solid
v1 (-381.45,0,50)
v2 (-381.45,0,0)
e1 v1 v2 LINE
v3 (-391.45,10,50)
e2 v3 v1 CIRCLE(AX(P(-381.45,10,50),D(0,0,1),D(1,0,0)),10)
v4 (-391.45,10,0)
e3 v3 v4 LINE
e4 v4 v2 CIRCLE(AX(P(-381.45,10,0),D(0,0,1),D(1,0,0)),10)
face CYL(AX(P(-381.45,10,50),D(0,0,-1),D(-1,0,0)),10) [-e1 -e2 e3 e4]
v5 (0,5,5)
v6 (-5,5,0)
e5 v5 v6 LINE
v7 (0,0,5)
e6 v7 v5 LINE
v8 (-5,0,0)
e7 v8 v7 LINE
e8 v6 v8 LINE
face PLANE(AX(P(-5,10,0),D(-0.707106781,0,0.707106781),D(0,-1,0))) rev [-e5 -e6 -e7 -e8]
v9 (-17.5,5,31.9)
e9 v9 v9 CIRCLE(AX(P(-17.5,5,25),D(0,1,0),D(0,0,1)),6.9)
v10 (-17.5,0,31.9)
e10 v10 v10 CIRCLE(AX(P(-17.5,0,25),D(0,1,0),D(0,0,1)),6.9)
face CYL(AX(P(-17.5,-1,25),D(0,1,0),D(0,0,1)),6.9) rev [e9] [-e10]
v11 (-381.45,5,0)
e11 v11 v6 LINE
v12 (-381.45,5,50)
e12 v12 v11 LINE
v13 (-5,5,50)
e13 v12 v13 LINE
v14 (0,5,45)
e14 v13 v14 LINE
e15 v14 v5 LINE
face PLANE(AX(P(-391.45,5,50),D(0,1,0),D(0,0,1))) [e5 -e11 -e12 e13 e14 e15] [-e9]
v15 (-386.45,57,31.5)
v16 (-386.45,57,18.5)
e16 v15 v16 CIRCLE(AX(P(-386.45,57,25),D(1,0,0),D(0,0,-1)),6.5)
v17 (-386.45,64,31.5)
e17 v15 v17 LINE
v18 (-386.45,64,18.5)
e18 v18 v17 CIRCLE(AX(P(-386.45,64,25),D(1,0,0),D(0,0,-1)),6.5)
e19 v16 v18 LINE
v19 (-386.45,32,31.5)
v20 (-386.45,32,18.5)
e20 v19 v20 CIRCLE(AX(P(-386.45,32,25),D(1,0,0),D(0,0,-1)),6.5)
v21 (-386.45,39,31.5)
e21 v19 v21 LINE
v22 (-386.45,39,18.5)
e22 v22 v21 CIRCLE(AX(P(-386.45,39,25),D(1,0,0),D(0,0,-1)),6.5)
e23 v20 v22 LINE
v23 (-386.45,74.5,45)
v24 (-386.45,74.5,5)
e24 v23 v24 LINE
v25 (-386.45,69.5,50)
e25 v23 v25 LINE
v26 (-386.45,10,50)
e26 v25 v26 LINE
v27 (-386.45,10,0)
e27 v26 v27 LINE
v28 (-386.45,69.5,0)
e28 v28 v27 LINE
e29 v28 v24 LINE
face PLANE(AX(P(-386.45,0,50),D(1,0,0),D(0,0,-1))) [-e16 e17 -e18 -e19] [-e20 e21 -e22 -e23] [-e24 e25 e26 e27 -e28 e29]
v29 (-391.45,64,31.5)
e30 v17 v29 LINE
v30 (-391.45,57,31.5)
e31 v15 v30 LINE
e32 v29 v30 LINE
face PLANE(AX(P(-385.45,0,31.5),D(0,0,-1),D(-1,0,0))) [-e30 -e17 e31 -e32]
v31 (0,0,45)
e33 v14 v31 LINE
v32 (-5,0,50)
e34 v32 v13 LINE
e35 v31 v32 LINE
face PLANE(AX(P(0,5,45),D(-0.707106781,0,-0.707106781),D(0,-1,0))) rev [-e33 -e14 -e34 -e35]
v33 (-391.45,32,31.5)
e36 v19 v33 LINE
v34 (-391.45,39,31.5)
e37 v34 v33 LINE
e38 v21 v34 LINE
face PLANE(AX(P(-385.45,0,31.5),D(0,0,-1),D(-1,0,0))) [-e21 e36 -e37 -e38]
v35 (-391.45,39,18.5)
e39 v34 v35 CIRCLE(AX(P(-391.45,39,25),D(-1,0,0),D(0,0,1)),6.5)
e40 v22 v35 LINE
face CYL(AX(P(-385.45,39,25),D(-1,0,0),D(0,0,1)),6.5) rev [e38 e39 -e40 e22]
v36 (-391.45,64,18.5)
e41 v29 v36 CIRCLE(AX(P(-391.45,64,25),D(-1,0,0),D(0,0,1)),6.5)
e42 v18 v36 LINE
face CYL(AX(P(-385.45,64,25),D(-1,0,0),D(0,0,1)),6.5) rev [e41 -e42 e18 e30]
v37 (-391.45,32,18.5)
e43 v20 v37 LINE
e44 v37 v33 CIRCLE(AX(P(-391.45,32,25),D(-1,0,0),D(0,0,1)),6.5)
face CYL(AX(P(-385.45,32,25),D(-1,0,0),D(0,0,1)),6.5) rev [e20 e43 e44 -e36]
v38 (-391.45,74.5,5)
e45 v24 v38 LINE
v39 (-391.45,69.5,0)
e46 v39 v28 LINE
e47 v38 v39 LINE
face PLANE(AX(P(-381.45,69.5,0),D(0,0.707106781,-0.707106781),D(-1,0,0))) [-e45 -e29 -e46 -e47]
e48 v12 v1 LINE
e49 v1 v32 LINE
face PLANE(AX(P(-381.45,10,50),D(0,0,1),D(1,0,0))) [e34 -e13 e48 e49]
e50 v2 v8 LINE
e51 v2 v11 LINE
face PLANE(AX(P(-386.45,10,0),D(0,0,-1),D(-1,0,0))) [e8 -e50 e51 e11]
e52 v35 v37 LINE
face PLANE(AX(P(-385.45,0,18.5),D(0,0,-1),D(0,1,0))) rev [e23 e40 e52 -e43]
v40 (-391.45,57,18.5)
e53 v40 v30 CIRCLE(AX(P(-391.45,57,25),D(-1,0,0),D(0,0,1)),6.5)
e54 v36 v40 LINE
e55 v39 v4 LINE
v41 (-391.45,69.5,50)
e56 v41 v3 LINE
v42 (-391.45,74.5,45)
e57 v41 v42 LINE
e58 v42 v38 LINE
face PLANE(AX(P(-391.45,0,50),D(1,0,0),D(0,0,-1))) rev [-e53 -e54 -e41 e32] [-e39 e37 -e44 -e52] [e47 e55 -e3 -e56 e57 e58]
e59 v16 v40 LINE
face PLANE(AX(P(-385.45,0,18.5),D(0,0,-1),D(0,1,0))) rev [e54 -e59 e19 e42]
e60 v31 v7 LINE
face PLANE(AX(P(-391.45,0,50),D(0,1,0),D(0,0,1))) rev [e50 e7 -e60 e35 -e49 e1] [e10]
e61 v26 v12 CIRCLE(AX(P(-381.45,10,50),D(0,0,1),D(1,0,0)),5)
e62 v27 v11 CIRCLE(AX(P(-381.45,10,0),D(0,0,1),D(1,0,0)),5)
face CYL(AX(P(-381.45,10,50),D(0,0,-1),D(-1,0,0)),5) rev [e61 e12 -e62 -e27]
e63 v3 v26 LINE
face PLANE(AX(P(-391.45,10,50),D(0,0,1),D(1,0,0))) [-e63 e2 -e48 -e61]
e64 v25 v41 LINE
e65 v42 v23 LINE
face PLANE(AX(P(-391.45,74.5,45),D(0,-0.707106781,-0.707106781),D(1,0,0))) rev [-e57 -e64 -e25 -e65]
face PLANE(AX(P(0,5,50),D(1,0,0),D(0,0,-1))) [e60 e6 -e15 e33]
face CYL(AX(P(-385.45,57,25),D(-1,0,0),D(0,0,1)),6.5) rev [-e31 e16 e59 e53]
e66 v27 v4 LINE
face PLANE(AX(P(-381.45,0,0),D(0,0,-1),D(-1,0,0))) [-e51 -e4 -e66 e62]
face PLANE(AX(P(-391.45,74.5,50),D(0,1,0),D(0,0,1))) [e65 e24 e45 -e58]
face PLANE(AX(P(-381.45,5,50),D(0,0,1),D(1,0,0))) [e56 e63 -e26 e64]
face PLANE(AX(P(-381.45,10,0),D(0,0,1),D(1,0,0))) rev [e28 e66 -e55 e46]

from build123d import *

# Parameters (mm, degrees)
SM_BASE_FLANGE_1_DEPTH = 50
SKETCH_3_R             = 6.9
CUT_EXTRUDE_2_DEPTH    = 10
SKETCH_4_R             = 6.5
CUT_EXTRUDE_3_DEPTH    = 10
OTHER_START            = 49.143921292
OTHER_1_OUTLINE_W      = 8
OTHER_1_OUTLINE_H      = 38
OTHER_1_DEPTH          = 3.535533906
OTHER_START_2          = 84.499260352
OTHER_1_2_OUTLINE_W    = 8
OTHER_1_2_OUTLINE_H    = 10
OTHER_1_2_DEPTH        = 3.535533906
OTHER_START_3          = -3.535533906
OTHER_1_3_OUTLINE_W    = 10
OTHER_1_3_OUTLINE_H    = 7
OTHER_1_3_DEPTH        = 3.535533906
OTHER_START_4          = 31.819805153
OTHER_1_4_OUTLINE_W    = 38
OTHER_1_4_OUTLINE_H    = 7
OTHER_1_4_DEPTH        = 3.535533906


# Read off the part's stored shape, not the designer's step: Затупленный угол1
# Sheet-metal steps are written as plain solids
with BuildPart() as part:
    # Sketch 1 → Базовая кромка1 (new body)
    with BuildSketch(Plane.XY):
        with BuildLine():
            Line((-391.45, 74.5), (-391.45, 10))
            ThreePointArc((-391.45, 10), (-388.521067812, 2.928932188), (-381.45, 0))
            Line((-381.45, 0), (0, 0))
            Line((0, 0), (0, 5))
            Line((0, 5), (-381.45, 5))
            ThreePointArc((-381.45, 5), (-384.985533906, 6.464466094), (-386.45, 10))
            Line((-386.45, 10), (-386.45, 74.5))
            Line((-386.45, 74.5), (-391.45, 74.5))
        make_face()
    extrude(amount=SM_BASE_FLANGE_1_DEPTH)

    # Эскиз3 → Вырез-Вытянуть2 (cut)
    with BuildSketch(Plane(origin=(0, 5, 0), x_dir=(1, 0, 0), z_dir=(0, 1, 0))):
        with Locations(Location((-17.5, -25, 0), (0, 0, 270))):
            Circle(SKETCH_3_R)
    extrude(amount=-CUT_EXTRUDE_2_DEPTH, mode=Mode.SUBTRACT)

    # Эскиз4 → Вырез-Вытянуть3 (cut)
    with BuildSketch(Plane.ZY.offset(391.45)):
        with BuildLine():
            Line((31.5, 32), (31.5, 35.5))
            ThreePointArc((31.5, 35.5), (25, 29), (18.5, 35.5))
            Line((18.5, 35.5), (18.5, 32))
            ThreePointArc((18.5, 32), (25, 25.5), (31.5, 32))
        make_face()
        with Locations((25, 35.5)):
            Circle(SKETCH_4_R)
        with BuildLine():
            Line((31.5, 35.5), (31.5, 39))
            ThreePointArc((31.5, 39), (25, 45.5), (18.5, 39))
            Line((18.5, 39), (18.5, 35.5))
            ThreePointArc((18.5, 35.5), (25, 42), (31.5, 35.5))
        make_face()
        with BuildLine():
            Line((31.5, 57), (31.5, 60.5))
            ThreePointArc((31.5, 60.5), (25, 54), (18.5, 60.5))
            Line((18.5, 60.5), (18.5, 57))
            ThreePointArc((18.5, 57), (25, 50.5), (31.5, 57))
        make_face()
        with Locations((25, 60.5)):
            Circle(SKETCH_4_R)
        with BuildLine():
            Line((31.5, 60.5), (31.5, 64))
            ThreePointArc((31.5, 64), (25, 70.5), (18.5, 64))
            Line((18.5, 64), (18.5, 60.5))
            ThreePointArc((18.5, 60.5), (25, 67), (31.5, 60.5))
        make_face()
    extrude(amount=-CUT_EXTRUDE_3_DEPTH, mode=Mode.SUBTRACT)

    # Other 1 outline → Other 1 (cut)
    with BuildSketch(Plane(origin=(0, 0, 0), x_dir=(1, 0, 0), z_dir=(0, 0.7071067811865476, -0.7071067811865476)).offset(OTHER_START)):
        with Locations((-389, -67)):
            Rectangle(OTHER_1_OUTLINE_W, OTHER_1_OUTLINE_H)
    extrude(amount=OTHER_1_DEPTH, mode=Mode.SUBTRACT)

    # Other 1 2 outline → Other 1 2 (cut)
    with BuildSketch(Plane(origin=(0, 0, 0), x_dir=(1, 0, 0), z_dir=(0, 0.7071067811865476, 0.7071067811865476)).offset(OTHER_START_2)):
        with Locations((-389, 17)):
            Rectangle(OTHER_1_2_OUTLINE_W, OTHER_1_2_OUTLINE_H)
    extrude(amount=OTHER_1_2_DEPTH, mode=Mode.SUBTRACT)

    # Other 1 3 outline → Other 1 3 (cut)
    with BuildSketch(Plane(origin=(0, 0, 0), x_dir=(0.707106781186549, 0, 0.707106781186546), z_dir=(0.707106781186546, 0, -0.707106781186549)).offset(OTHER_START_3)):
        with Locations((0, -2.5)):
            Rectangle(OTHER_1_3_OUTLINE_W, OTHER_1_3_OUTLINE_H)
    extrude(amount=OTHER_1_3_DEPTH, mode=Mode.SUBTRACT)

    # Other 1 4 outline → Other 1 4 (cut)
    with BuildSketch(Plane(origin=(0, 0, 0), x_dir=(0.707106781186549, 0, -0.707106781186546), z_dir=(0.707106781186546, 0, 0.707106781186549)).offset(OTHER_START_4)):
        with Locations((-21, 2.5)):
            Rectangle(OTHER_1_4_OUTLINE_W, OTHER_1_4_OUTLINE_H)
    extrude(amount=OTHER_1_4_DEPTH, mode=Mode.SUBTRACT)


solid = part.part
